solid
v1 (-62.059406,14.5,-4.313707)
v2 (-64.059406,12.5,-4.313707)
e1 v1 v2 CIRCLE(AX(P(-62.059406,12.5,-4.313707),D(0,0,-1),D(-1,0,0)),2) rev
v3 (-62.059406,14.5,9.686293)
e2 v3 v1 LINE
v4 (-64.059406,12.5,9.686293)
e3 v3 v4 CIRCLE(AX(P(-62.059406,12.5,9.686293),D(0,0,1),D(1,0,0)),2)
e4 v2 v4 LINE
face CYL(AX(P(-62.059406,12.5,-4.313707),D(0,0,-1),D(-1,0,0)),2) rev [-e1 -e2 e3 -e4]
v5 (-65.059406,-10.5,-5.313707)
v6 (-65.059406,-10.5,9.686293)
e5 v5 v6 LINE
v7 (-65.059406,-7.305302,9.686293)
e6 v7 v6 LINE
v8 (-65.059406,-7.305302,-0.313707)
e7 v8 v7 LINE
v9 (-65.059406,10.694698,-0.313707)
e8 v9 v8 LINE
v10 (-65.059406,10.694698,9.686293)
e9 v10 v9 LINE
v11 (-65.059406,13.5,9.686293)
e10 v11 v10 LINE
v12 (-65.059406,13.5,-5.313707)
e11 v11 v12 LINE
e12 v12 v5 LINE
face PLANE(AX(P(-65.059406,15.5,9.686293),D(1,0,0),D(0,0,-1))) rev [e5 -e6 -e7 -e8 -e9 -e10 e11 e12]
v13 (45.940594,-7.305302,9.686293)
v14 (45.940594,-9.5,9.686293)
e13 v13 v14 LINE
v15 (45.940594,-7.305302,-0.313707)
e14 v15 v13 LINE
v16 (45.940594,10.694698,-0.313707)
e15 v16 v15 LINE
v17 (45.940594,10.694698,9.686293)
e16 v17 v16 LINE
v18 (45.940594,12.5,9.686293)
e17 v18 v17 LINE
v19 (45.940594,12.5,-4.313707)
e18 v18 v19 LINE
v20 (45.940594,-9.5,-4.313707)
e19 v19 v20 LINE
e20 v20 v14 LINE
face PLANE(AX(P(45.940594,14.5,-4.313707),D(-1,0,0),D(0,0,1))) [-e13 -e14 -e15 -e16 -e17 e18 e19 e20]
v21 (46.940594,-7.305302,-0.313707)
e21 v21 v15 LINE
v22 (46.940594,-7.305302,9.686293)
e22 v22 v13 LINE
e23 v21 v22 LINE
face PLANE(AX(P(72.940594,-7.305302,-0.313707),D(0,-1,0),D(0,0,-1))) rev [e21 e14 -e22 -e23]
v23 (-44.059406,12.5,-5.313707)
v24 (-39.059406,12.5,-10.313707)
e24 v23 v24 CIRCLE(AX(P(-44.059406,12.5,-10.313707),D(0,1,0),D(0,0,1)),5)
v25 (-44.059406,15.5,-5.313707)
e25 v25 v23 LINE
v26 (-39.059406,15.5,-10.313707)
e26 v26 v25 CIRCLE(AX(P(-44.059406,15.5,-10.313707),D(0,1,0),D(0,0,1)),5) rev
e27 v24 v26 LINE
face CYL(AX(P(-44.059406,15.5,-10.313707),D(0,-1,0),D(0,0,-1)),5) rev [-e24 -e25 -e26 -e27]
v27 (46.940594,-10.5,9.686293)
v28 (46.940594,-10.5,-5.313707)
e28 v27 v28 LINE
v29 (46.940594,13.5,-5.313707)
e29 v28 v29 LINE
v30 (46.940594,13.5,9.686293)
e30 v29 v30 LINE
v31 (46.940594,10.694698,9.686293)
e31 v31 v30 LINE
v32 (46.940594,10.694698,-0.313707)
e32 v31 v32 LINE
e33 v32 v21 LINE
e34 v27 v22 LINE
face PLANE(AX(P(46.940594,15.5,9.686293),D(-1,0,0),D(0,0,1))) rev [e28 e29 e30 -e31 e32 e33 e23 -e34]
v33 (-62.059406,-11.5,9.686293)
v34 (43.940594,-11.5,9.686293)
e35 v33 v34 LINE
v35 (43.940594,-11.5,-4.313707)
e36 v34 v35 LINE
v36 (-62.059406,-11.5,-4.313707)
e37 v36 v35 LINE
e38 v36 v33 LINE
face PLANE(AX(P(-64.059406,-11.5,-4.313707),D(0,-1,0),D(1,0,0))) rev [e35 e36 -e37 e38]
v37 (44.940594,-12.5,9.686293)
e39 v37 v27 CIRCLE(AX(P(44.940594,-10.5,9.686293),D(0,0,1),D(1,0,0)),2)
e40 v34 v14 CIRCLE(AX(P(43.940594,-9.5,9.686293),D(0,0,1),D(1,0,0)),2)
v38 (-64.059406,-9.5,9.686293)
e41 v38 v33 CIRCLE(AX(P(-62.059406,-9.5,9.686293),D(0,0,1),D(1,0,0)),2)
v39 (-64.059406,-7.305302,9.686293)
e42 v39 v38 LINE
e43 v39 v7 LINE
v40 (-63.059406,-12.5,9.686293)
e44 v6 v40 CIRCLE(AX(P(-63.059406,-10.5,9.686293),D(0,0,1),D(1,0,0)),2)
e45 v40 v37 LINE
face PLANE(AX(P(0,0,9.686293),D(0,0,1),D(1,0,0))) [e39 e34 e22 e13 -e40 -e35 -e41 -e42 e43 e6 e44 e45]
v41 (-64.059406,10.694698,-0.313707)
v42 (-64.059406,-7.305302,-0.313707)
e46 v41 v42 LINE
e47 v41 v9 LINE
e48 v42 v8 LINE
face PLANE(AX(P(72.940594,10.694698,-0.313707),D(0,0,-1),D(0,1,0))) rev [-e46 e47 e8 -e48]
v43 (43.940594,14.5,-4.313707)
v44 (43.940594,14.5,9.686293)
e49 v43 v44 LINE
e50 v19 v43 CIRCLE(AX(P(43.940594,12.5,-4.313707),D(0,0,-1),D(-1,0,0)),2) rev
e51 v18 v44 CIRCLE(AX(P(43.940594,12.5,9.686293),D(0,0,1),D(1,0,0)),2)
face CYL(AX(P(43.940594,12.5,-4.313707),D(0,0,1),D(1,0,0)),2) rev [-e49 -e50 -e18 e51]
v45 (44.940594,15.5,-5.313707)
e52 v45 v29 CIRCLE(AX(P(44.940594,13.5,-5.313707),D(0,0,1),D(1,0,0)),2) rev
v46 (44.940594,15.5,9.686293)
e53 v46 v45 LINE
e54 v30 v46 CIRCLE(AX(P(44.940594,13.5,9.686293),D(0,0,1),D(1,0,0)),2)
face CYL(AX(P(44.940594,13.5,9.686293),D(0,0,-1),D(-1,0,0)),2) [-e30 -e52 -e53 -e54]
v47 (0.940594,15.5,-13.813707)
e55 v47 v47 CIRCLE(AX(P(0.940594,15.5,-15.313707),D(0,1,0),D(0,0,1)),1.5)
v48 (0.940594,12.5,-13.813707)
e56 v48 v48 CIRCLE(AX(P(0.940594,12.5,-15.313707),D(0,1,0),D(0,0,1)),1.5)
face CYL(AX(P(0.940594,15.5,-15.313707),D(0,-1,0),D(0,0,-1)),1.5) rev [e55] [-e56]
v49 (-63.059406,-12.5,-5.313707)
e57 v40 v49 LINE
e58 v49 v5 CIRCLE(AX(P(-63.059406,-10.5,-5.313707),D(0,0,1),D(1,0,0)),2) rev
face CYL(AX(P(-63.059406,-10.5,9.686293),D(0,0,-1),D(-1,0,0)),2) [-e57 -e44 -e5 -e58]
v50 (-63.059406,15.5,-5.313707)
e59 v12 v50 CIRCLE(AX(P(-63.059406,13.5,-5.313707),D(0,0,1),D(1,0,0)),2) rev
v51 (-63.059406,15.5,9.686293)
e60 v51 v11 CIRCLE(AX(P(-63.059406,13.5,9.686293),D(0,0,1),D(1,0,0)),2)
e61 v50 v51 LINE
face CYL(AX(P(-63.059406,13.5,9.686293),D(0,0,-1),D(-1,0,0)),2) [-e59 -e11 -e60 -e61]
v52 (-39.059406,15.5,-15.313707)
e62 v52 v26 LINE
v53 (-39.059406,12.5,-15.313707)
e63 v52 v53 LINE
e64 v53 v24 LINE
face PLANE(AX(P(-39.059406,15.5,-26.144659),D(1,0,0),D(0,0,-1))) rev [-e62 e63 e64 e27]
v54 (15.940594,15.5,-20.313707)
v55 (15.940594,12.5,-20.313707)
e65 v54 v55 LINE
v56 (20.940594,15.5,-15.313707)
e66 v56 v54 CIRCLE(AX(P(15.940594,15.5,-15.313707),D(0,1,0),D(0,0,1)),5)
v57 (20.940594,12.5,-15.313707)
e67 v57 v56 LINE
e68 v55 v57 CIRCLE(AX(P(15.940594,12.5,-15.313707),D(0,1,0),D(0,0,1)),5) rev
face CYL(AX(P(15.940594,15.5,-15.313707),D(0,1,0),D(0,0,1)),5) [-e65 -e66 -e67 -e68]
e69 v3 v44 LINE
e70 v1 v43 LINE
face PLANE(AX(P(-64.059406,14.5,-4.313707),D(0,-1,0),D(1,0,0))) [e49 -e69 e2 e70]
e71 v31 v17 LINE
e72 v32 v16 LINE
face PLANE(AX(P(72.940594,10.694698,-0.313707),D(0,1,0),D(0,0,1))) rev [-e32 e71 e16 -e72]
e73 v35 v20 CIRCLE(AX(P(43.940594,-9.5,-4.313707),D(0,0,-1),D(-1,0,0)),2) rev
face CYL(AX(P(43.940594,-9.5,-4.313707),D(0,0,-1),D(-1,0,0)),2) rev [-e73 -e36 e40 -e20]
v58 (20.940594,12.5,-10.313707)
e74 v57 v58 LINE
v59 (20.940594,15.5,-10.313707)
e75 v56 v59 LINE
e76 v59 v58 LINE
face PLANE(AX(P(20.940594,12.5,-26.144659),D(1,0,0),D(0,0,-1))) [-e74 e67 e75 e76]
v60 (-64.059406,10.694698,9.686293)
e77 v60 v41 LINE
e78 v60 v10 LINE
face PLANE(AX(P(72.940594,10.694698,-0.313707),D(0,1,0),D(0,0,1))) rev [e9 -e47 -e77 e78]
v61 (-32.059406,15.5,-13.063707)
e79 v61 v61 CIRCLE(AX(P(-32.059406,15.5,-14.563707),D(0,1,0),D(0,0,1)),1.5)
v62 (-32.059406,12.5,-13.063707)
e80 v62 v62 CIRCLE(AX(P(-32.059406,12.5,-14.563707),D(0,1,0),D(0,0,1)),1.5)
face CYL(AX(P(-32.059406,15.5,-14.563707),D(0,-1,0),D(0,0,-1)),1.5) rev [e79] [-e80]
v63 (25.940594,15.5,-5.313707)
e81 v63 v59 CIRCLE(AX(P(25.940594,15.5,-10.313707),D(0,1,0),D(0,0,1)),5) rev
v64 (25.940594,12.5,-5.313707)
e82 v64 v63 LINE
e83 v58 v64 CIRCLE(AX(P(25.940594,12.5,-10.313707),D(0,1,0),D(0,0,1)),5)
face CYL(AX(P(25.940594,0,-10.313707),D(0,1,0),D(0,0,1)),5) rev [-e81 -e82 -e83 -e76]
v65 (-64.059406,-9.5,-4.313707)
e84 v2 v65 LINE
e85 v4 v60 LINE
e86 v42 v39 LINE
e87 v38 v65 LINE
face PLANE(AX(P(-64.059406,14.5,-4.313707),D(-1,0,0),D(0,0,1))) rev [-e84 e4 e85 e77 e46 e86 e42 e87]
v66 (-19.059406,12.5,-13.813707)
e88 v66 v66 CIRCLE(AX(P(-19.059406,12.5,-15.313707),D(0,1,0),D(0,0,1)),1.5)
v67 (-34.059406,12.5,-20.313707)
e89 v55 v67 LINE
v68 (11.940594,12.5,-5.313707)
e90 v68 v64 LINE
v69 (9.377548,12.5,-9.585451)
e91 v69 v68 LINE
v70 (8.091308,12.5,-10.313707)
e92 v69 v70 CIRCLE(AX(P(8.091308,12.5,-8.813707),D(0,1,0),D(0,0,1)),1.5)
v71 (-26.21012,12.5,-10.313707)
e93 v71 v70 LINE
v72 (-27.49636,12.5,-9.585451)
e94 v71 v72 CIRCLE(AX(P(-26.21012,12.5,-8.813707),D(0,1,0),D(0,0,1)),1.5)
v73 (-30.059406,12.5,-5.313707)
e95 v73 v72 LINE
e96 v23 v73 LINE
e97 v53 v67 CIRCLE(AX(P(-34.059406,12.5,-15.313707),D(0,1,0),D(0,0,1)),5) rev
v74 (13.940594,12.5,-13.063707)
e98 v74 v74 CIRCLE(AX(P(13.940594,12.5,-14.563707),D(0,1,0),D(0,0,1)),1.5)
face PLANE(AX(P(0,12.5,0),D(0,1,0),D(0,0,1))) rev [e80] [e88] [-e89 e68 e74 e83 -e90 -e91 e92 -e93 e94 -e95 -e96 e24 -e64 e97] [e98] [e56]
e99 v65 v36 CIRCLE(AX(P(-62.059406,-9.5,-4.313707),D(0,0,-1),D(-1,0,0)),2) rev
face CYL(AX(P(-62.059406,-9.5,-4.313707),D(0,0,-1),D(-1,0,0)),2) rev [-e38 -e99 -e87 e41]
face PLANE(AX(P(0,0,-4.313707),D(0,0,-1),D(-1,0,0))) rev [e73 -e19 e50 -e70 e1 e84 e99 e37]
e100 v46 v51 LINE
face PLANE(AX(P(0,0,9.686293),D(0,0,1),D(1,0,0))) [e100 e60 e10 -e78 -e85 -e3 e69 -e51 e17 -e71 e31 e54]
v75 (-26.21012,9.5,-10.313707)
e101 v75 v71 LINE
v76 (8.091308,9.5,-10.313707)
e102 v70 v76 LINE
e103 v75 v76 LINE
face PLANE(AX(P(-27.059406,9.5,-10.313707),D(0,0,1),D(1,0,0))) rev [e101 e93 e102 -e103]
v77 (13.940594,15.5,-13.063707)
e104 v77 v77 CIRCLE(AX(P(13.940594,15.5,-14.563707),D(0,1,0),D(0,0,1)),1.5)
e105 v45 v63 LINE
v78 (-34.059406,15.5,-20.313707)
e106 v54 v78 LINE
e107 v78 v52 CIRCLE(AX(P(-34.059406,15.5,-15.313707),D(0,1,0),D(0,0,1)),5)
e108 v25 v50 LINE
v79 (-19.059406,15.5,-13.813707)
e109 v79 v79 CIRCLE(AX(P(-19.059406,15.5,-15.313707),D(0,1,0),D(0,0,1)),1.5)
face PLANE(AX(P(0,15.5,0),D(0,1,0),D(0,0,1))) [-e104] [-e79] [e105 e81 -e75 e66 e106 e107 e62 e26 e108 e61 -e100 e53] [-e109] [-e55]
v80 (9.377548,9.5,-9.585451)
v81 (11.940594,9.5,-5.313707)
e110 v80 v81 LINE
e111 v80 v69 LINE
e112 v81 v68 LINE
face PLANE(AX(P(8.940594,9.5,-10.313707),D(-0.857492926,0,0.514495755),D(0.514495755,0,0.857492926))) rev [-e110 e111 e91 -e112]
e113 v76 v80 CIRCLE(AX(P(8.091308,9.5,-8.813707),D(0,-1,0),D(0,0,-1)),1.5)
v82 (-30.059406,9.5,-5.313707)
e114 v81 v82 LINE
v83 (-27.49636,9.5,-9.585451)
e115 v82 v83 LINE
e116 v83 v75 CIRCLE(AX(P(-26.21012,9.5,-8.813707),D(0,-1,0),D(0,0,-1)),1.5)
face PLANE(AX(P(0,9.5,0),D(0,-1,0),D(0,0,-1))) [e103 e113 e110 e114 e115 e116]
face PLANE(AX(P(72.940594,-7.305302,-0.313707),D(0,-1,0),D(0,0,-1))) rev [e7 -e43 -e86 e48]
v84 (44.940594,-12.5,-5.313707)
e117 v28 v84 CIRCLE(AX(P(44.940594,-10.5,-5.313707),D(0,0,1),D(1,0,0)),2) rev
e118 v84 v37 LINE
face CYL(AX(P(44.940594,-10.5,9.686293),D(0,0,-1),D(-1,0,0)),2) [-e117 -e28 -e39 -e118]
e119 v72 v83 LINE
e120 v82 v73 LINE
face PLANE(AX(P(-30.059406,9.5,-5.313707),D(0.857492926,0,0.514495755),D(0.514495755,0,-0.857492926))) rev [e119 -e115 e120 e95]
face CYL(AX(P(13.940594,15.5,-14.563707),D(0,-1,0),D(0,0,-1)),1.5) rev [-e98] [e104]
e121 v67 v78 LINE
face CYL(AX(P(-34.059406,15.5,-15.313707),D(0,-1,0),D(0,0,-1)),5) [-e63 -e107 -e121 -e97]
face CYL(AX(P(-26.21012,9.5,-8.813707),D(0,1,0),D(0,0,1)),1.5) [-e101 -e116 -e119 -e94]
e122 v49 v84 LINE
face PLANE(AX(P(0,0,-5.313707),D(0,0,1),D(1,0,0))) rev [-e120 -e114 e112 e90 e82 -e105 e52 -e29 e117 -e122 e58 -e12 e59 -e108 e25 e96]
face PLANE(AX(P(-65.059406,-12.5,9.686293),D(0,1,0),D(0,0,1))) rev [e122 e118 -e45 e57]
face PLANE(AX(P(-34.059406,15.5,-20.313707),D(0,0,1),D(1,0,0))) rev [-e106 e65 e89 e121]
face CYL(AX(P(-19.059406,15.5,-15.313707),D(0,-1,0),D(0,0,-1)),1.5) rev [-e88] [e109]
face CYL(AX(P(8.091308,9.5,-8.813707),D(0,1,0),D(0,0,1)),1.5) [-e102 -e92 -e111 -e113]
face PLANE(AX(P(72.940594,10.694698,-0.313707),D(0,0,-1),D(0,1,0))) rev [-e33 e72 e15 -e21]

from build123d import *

# Parameters (mm, degrees)
SKETCH1_W           = 50
SKETCH1_H           = 15
SKETCH1_R           = 1.5
BOSS_EXTRUDE1_DEPTH = 3
SKETCH8_W           = 112
SKETCH8_H           = 28
BOSS_EXTRUDE3_DEPTH = 15
BOSS_EXTRUDE4_DEPTH = 3
FILLET3_R           = 1.5
FILLET4_R           = 2
SKETCH11_W          = 110
SKETCH11_H          = 26
CUT_EXTRUDE1_DEPTH  = 14
FILLET6_R           = 2
FILLET7_R           = 2
FILLET8_R           = 2
FILLET9_R           = 2
SKETCH12_W          = 10
SKETCH12_H          = 18
CUT_EXTRUDE2_DEPTH  = 138
SKETCH14_W          = 5
SKETCH14_H          = 3
BOSS_EXTRUDE5_DEPTH = 15
SKETCH15_W          = 5
SKETCH15_H          = 3
BOSS_EXTRUDE6_DEPTH = 15
FILLET12_R          = 5
FILLET13_R          = 5
FILLET14_R          = 5


with BuildPart() as part:
    # Sketch1 → Boss-Extrude1 (new body)
    with BuildSketch(Plane(origin=(0, 0, -9.678822938), x_dir=(1, 0, 0), z_dir=(0, 1, 0))):
        with Locations((-9.059405941, 3.134884125)):
            Rectangle(SKETCH1_W, SKETCH1_H)
        with Locations(Location((-19.059405941, 5.634884125, 0), (0, 0, 270))):
            Circle(SKETCH1_R, mode=Mode.SUBTRACT)
        with Locations(Location((0.940594059, 5.634884125, 0), (0, 0, 270))):
            Circle(SKETCH1_R, mode=Mode.SUBTRACT)
        with Locations(Location((-32.059405941, 4.884884125, 0), (0, 0, 270))):
            Circle(SKETCH1_R, mode=Mode.SUBTRACT)
        with Locations(Location((13.940594059, 4.884884125, 0), (0, 0, 270))):
            Circle(SKETCH1_R, mode=Mode.SUBTRACT)
    extrude(amount=BOSS_EXTRUDE1_DEPTH)

    # Sketch9 → Boss-Extrude4 (add)
    with BuildSketch(Plane.XZ):
        Polygon((-27.059405941, -10.313707063), (8.940594059, -10.313707063), (11.940594059, -5.313707063), (-30.059405941, -5.313707063), align=None)
    extrude(amount=BOSS_EXTRUDE4_DEPTH)

    # Fillet3
    fillet3_edges = [part.edges().sort_by_distance(p)[0] for p in [
        (-27.059405941, -1.5, -10.313707063),
        (8.940594059, -1.5, -10.313707063),
    ]]
    fillet(fillet3_edges, radius=FILLET3_R)


with BuildPart() as body_2:
    # Sketch8 → Boss-Extrude3 (new body)
    with BuildSketch(Plane.XY.offset(-5.313707063)):
        with Locations((-9.059405941, 1.5)):
            Rectangle(SKETCH8_W, SKETCH8_H)
    extrude(amount=BOSS_EXTRUDE3_DEPTH)

    # Fillet4
    fillet4_edges = [body_2.edges().sort_by_distance(p)[0] for p in [
        (-65.059405941, 15.5, 2.186292937),
        (46.940594059, 15.5, 2.186292937),
        (46.940594059, -12.5, 2.186292937),
        (-65.059405941, -12.5, 2.186292937),
    ]]
    fillet(fillet4_edges, radius=FILLET4_R)

    # Sketch11 → Cut-Extrude1 (cut)
    with BuildSketch(Plane.XY.offset(9.686292937)):
        with Locations((-9.059405941, 1.5)):
            Rectangle(SKETCH11_W, SKETCH11_H)
    extrude(amount=-CUT_EXTRUDE1_DEPTH, mode=Mode.SUBTRACT)

    # Fillet6
    fillet6_edges = [body_2.edges().sort_by_distance(p)[0] for p in [
        (-64.059405941, 14.5, 2.686292937),
    ]]
    fillet(fillet6_edges, radius=FILLET6_R)

    # Fillet7
    fillet7_edges = [body_2.edges().sort_by_distance(p)[0] for p in [
        (-64.059405941, -11.5, 2.686292937),
    ]]
    fillet(fillet7_edges, radius=FILLET7_R)

    # Fillet8
    fillet8_edges = [body_2.edges().sort_by_distance(p)[0] for p in [
        (45.940594059, -11.5, 2.686292937),
    ]]
    fillet(fillet8_edges, radius=FILLET8_R)

    # Fillet9
    fillet9_edges = [body_2.edges().sort_by_distance(p)[0] for p in [
        (45.940594059, 14.5, 2.686292937),
    ]]
    fillet(fillet9_edges, radius=FILLET9_R)

    # Sketch12 → Cut-Extrude2 (cut)
    with BuildSketch(Plane.ZY.offset(65.059405941)):
        with Locations((4.686292937, 1.694698027)):
            Rectangle(SKETCH12_W, SKETCH12_H)
    extrude(amount=-CUT_EXTRUDE2_DEPTH, mode=Mode.SUBTRACT)


with BuildPart() as part_1:
    # Body-Move/Copy1: read off the stored shape, not the designer's step
    # Body-Move/Copy1: moved
    add(part.part.moved(Location((0, 12.5, 0))))


    add(body_2.part)  # Boss-Extrude5 merges body 2
    # Sketch14 → Boss-Extrude5 (add)
    with BuildSketch(Plane(origin=(0, 0, -5.313707063), x_dir=(-1, 0, 0), z_dir=(0, 0, -1))):
        with Locations((36.559405941, 14)):
            Rectangle(SKETCH14_W, SKETCH14_H)
    extrude(amount=BOSS_EXTRUDE5_DEPTH)

    # Sketch15 → Boss-Extrude6 (add)
    with BuildSketch(Plane(origin=(0, 0, -5.313707063), x_dir=(-1, 0, 0), z_dir=(0, 0, -1))):
        with Locations((-18.440594059, 14)):
            Rectangle(SKETCH15_W, SKETCH15_H)
    extrude(amount=BOSS_EXTRUDE6_DEPTH)

    # Fillet12
    fillet12_edges = [part_1.edges().sort_by_distance(p)[0] for p in [
        (20.940594059, 14, -5.313707063),
    ]]
    fillet(fillet12_edges, radius=FILLET12_R)

    # Fillet13
    fillet13_edges = [part_1.edges().sort_by_distance(p)[0] for p in [
        (-39.059405941, 14, -5.313707063),
    ]]
    fillet(fillet13_edges, radius=FILLET13_R)

    # Fillet14
    fillet14_edges = [part_1.edges().sort_by_distance(p)[0] for p in [
        (20.940594059, 14, -20.313707063),
        (-39.059405941, 14, -20.313707063),
    ]]
    fillet(fillet14_edges, radius=FILLET14_R)


solid = part_1.part
